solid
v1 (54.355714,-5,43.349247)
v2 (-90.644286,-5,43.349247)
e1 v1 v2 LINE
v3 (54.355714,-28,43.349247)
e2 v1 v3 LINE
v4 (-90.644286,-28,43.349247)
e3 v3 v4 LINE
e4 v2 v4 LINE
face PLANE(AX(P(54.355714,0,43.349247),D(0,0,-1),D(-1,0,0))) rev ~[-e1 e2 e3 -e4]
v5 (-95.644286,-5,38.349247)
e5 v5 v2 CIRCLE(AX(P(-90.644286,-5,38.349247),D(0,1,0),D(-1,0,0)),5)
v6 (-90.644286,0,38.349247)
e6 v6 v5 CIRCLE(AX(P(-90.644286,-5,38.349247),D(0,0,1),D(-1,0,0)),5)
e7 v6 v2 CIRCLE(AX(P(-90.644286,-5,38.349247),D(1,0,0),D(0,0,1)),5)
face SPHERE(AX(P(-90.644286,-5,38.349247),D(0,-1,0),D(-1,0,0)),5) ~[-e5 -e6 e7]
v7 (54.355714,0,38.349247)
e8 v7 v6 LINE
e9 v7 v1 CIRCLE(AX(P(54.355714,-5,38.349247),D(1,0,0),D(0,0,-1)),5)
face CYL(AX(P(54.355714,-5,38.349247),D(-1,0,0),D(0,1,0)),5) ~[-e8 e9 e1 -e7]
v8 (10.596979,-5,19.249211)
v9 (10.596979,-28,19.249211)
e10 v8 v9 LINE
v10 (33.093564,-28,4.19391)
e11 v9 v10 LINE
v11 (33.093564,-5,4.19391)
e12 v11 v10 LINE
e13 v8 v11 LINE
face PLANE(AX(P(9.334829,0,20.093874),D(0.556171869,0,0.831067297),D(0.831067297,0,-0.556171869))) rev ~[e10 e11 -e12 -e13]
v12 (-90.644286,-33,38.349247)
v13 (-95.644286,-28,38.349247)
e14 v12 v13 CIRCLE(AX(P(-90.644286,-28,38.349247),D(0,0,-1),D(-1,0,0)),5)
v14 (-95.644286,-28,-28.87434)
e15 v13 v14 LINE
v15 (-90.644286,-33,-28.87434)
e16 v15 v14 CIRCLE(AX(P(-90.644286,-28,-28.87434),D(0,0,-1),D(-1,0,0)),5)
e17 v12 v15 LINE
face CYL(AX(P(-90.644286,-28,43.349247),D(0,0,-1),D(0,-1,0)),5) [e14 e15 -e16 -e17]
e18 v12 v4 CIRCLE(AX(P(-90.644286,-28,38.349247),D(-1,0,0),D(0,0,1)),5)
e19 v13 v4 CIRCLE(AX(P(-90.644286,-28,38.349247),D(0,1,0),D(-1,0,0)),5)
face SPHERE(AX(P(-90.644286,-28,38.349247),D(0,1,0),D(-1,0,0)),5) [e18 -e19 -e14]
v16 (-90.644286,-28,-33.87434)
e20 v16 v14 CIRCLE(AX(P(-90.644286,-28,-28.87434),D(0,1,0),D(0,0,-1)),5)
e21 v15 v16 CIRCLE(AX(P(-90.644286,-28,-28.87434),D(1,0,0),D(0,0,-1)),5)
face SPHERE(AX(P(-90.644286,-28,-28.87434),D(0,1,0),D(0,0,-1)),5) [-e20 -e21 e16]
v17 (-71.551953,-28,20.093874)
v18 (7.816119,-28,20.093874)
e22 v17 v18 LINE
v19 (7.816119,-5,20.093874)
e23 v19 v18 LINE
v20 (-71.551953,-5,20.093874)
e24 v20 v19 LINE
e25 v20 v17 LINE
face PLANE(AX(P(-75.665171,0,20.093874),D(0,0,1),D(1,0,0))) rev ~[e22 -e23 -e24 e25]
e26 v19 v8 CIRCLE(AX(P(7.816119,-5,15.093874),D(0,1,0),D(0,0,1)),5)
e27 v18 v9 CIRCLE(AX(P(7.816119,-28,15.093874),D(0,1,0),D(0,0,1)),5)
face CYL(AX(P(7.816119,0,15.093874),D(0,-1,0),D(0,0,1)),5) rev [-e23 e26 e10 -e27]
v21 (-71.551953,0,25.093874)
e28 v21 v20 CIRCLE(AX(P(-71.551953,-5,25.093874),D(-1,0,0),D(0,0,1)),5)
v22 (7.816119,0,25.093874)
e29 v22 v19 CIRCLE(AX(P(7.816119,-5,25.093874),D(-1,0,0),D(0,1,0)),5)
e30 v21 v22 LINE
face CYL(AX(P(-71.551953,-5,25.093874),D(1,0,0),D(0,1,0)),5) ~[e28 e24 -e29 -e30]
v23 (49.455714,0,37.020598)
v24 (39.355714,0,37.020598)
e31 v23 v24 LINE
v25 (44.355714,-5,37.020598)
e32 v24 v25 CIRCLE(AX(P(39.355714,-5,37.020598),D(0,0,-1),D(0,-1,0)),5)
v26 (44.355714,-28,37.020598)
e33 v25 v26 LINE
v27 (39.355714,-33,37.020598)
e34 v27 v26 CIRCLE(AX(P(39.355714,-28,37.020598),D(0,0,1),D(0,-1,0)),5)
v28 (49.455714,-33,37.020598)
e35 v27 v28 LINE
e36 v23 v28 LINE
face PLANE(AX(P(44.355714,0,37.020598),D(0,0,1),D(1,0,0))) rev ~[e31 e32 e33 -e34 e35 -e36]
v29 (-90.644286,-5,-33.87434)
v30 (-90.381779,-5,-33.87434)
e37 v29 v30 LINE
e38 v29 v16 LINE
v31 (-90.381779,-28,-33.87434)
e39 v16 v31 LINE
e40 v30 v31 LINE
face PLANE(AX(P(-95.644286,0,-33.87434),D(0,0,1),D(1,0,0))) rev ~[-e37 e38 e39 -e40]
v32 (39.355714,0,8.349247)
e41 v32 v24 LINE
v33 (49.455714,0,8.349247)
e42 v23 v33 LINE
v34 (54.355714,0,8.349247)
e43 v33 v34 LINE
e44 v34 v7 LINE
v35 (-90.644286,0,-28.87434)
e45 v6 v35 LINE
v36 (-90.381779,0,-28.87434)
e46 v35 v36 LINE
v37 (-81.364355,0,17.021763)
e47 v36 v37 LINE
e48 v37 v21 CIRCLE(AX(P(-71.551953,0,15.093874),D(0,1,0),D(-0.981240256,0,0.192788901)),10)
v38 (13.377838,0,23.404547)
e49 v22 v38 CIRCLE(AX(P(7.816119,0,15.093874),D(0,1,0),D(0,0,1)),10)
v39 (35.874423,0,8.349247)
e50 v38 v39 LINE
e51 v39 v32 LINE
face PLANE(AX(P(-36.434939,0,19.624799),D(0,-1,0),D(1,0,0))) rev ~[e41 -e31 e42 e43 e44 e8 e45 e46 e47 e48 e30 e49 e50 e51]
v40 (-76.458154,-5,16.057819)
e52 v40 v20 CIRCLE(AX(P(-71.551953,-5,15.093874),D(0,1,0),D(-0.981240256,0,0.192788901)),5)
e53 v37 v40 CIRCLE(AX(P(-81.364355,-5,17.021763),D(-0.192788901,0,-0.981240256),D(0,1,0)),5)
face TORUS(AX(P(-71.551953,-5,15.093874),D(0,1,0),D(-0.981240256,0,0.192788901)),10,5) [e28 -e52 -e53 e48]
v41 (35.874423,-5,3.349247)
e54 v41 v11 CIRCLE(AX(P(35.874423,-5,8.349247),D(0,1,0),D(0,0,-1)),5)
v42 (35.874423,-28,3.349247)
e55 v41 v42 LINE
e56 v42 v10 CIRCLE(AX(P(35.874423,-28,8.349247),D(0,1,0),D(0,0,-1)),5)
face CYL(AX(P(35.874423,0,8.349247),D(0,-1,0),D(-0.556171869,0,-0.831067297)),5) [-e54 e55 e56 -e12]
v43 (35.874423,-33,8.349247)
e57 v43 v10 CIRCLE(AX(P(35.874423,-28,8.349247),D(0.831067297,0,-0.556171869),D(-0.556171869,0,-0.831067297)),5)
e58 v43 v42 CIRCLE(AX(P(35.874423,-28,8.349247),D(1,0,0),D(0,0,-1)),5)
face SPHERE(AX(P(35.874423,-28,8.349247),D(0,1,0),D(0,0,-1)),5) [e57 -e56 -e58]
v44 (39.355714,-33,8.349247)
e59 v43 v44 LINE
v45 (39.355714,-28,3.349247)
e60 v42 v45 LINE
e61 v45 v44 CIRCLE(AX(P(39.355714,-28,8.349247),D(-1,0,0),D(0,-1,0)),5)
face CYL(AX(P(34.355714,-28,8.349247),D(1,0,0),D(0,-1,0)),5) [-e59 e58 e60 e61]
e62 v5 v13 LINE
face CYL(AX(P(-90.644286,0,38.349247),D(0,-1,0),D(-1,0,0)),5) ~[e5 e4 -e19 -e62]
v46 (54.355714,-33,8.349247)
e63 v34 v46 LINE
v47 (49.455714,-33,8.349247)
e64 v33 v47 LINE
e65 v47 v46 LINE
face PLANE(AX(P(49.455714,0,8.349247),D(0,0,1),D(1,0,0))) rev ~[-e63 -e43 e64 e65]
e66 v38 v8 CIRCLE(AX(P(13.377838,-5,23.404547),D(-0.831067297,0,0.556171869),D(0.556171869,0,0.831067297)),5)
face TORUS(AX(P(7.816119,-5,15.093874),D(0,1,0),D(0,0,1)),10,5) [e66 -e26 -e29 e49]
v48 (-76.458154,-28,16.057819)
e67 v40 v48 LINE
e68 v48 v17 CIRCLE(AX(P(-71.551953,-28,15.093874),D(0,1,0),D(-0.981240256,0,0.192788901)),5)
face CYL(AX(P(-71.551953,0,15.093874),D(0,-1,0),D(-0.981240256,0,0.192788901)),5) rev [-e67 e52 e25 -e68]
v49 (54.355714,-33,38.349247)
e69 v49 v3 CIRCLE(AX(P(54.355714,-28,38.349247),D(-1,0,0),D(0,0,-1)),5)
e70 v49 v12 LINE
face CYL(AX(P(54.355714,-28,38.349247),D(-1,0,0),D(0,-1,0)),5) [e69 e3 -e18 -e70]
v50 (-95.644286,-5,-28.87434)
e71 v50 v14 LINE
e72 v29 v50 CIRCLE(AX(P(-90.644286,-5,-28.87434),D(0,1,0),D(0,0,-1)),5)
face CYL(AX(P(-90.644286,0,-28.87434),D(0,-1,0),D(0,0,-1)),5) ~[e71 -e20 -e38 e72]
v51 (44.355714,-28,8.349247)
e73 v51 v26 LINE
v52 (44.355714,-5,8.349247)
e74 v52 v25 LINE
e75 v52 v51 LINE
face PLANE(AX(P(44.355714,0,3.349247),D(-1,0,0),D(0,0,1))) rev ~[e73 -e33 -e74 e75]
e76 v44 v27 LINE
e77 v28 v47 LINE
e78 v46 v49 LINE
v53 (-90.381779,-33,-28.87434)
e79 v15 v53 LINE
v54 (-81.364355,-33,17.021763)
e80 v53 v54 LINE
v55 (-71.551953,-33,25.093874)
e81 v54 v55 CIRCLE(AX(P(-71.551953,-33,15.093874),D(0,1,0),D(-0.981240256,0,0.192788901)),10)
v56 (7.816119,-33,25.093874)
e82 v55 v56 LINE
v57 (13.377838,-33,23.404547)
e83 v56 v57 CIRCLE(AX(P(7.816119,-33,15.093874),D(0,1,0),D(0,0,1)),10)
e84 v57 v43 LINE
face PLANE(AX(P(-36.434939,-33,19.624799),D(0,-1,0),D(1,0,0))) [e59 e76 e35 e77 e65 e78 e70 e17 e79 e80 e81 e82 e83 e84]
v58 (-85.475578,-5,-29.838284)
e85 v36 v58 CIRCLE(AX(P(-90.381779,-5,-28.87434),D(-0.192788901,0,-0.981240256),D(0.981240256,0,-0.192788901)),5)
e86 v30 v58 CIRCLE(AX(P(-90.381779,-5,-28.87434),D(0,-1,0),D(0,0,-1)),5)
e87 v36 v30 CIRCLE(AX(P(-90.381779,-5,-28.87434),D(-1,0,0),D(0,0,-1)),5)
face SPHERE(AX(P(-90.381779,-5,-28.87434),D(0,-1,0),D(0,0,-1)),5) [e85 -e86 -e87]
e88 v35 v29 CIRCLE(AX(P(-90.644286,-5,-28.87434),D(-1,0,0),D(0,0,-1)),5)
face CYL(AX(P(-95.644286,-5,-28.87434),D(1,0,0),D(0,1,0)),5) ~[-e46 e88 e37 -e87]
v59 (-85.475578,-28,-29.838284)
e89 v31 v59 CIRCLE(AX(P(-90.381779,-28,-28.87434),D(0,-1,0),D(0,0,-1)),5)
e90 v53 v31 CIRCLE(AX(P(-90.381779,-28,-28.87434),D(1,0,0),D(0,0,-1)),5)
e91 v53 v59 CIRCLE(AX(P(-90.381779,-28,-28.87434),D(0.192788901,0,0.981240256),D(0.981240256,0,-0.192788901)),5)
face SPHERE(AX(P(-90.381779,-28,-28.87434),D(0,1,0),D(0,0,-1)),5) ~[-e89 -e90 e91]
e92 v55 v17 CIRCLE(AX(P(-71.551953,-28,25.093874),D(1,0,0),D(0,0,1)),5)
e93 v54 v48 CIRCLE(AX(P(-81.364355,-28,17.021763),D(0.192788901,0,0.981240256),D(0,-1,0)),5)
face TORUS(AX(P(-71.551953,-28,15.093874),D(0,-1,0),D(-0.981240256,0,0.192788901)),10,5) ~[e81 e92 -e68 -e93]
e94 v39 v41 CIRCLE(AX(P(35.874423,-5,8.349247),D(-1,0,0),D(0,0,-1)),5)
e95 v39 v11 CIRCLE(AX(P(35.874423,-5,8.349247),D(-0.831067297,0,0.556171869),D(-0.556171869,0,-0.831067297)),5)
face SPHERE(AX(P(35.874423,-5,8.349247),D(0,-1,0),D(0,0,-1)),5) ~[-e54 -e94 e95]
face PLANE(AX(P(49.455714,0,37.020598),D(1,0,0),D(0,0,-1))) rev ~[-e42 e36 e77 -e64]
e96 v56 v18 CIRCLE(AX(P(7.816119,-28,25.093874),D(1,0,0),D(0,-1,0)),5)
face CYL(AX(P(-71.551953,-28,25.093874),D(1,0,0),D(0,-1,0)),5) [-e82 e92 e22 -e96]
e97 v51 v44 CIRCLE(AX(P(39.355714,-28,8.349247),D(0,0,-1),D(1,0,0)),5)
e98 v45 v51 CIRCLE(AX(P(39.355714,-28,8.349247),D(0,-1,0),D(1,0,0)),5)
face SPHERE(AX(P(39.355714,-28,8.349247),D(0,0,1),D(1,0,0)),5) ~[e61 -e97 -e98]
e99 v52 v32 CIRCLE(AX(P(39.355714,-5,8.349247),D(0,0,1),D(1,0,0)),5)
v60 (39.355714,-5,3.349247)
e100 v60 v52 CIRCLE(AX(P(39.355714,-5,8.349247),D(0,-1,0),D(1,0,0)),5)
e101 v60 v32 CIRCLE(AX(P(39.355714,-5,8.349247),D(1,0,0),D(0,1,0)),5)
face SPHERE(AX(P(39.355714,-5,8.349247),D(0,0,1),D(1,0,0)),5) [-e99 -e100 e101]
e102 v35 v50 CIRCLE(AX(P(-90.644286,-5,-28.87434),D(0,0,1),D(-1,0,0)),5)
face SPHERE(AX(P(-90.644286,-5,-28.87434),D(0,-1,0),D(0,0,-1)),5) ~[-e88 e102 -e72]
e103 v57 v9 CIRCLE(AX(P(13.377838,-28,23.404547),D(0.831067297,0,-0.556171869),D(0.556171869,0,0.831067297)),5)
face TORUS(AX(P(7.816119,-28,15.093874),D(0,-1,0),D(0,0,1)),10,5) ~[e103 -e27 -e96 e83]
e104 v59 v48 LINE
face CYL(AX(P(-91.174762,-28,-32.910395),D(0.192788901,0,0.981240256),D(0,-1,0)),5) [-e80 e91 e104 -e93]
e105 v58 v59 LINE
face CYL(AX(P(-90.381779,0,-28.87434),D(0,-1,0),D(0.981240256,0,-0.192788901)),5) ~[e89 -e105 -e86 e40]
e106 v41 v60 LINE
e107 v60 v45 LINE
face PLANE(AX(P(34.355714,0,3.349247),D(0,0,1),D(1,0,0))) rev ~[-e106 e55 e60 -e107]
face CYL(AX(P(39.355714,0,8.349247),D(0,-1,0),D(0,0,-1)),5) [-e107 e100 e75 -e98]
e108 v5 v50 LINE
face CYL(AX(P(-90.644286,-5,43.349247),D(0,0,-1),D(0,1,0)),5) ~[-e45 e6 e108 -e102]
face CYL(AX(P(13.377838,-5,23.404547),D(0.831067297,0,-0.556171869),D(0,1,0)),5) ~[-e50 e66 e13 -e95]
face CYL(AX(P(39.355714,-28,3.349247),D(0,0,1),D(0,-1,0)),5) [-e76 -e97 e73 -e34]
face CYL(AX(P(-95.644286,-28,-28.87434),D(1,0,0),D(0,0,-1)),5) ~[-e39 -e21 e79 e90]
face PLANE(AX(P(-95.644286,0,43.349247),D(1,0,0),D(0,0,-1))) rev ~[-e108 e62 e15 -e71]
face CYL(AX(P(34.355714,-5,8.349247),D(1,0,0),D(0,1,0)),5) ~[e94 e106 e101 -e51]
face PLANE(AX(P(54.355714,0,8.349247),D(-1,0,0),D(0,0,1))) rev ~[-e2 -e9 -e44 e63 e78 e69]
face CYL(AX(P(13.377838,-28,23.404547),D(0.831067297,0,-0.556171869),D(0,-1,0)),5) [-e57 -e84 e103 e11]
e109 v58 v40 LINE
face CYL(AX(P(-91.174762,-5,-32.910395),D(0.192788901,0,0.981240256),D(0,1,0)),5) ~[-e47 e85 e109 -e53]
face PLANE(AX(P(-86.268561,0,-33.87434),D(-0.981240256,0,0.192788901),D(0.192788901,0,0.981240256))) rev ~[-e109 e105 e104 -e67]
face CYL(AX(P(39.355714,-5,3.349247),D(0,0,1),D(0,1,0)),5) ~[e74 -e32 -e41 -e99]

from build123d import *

# Parameters (mm, degrees)
F1_DEPTH = 33
F2_F1_R  = 5
F2_F2_R  = 5


with BuildPart() as f1:
    # F0 (on Front) → F1 (new body)
    with BuildSketch(Plane.XZ):
        Polygon((44.3557138985, 43.3492468083), (-95.6442861015, 43.3492468083), (-95.6442861015, -33.8743397176), (-86.2685606181, -33.8743397176), (-75.6651710416, 20.0938743485), (9.3348289584, 20.0938743485), (34.3557138985, 3.3492468083), (44.3557138985, 3.3492468083), (44.3557138985, 37.0205976069), align=None)
        Polygon((54.3557138985, 43.3492468083), (44.3557138985, 43.3492468083), (44.3557138985, 37.0205976069), (49.4557138985, 37.0205976069), (49.4557138985, 8.3492468083), (54.3557138985, 8.3492468083), align=None)
    extrude(amount=F1_DEPTH)

    # F2: fillet of radius 5 on 19 edges, made by hand

    # F2_f1
    f2_f1_edges = [f1.edges().sort_by_distance(p)[0] for p in [
        (-75.6651710416, -16.5, 20.0938743485),
        (9.3348289584, -16.5, 20.0938743485),
    ]]
    fillet(f2_f1_edges, radius=F2_F1_R)

    # F2_f2
    f2_f2_edges = [f1.edges().sort_by_distance(p)[0] for p in [
        (-31.8679165952, 0, 20.0938743485),
        (-31.8679165952, -33, 20.0938743485),
        (-95.6442861015, -16.5, -33.8743397176),
        (-86.2685606181, -16.5, -33.8743397176),
        (-90.9564233598, 0, -33.8743397176),
        (-90.9564233598, -33, -33.8743397176),
        (-95.6442861015, -16.5, 43.3492468083),
        (-95.6442861015, 0, 4.7374535453),
        (-95.6442861015, -33, 4.7374535453),
        (-20.6442861015, 0, 43.3492468083),
        (-20.6442861015, -33, 43.3492468083),
        (34.3557138985, -16.5, 3.3492468083),
        (44.3557138985, -33, 20.1849222076),
        (44.3557138985, 0, 20.1849222076),
        (44.3557138985, -16.5, 3.3492468083),
        (39.3557138985, 0, 3.3492468083),
        (39.3557138985, -33, 3.3492468083),
        (-74.7284504953, -33, 18.9552032994),
        (9.2692742039, -33, 19.8780504751),
        (-74.7284504953, 0, 18.9552032994),
        (9.2692742039, 0, 19.8780504751),
    ]]
    fillet(f2_f2_edges, radius=F2_F2_R)


solid = f1.part
